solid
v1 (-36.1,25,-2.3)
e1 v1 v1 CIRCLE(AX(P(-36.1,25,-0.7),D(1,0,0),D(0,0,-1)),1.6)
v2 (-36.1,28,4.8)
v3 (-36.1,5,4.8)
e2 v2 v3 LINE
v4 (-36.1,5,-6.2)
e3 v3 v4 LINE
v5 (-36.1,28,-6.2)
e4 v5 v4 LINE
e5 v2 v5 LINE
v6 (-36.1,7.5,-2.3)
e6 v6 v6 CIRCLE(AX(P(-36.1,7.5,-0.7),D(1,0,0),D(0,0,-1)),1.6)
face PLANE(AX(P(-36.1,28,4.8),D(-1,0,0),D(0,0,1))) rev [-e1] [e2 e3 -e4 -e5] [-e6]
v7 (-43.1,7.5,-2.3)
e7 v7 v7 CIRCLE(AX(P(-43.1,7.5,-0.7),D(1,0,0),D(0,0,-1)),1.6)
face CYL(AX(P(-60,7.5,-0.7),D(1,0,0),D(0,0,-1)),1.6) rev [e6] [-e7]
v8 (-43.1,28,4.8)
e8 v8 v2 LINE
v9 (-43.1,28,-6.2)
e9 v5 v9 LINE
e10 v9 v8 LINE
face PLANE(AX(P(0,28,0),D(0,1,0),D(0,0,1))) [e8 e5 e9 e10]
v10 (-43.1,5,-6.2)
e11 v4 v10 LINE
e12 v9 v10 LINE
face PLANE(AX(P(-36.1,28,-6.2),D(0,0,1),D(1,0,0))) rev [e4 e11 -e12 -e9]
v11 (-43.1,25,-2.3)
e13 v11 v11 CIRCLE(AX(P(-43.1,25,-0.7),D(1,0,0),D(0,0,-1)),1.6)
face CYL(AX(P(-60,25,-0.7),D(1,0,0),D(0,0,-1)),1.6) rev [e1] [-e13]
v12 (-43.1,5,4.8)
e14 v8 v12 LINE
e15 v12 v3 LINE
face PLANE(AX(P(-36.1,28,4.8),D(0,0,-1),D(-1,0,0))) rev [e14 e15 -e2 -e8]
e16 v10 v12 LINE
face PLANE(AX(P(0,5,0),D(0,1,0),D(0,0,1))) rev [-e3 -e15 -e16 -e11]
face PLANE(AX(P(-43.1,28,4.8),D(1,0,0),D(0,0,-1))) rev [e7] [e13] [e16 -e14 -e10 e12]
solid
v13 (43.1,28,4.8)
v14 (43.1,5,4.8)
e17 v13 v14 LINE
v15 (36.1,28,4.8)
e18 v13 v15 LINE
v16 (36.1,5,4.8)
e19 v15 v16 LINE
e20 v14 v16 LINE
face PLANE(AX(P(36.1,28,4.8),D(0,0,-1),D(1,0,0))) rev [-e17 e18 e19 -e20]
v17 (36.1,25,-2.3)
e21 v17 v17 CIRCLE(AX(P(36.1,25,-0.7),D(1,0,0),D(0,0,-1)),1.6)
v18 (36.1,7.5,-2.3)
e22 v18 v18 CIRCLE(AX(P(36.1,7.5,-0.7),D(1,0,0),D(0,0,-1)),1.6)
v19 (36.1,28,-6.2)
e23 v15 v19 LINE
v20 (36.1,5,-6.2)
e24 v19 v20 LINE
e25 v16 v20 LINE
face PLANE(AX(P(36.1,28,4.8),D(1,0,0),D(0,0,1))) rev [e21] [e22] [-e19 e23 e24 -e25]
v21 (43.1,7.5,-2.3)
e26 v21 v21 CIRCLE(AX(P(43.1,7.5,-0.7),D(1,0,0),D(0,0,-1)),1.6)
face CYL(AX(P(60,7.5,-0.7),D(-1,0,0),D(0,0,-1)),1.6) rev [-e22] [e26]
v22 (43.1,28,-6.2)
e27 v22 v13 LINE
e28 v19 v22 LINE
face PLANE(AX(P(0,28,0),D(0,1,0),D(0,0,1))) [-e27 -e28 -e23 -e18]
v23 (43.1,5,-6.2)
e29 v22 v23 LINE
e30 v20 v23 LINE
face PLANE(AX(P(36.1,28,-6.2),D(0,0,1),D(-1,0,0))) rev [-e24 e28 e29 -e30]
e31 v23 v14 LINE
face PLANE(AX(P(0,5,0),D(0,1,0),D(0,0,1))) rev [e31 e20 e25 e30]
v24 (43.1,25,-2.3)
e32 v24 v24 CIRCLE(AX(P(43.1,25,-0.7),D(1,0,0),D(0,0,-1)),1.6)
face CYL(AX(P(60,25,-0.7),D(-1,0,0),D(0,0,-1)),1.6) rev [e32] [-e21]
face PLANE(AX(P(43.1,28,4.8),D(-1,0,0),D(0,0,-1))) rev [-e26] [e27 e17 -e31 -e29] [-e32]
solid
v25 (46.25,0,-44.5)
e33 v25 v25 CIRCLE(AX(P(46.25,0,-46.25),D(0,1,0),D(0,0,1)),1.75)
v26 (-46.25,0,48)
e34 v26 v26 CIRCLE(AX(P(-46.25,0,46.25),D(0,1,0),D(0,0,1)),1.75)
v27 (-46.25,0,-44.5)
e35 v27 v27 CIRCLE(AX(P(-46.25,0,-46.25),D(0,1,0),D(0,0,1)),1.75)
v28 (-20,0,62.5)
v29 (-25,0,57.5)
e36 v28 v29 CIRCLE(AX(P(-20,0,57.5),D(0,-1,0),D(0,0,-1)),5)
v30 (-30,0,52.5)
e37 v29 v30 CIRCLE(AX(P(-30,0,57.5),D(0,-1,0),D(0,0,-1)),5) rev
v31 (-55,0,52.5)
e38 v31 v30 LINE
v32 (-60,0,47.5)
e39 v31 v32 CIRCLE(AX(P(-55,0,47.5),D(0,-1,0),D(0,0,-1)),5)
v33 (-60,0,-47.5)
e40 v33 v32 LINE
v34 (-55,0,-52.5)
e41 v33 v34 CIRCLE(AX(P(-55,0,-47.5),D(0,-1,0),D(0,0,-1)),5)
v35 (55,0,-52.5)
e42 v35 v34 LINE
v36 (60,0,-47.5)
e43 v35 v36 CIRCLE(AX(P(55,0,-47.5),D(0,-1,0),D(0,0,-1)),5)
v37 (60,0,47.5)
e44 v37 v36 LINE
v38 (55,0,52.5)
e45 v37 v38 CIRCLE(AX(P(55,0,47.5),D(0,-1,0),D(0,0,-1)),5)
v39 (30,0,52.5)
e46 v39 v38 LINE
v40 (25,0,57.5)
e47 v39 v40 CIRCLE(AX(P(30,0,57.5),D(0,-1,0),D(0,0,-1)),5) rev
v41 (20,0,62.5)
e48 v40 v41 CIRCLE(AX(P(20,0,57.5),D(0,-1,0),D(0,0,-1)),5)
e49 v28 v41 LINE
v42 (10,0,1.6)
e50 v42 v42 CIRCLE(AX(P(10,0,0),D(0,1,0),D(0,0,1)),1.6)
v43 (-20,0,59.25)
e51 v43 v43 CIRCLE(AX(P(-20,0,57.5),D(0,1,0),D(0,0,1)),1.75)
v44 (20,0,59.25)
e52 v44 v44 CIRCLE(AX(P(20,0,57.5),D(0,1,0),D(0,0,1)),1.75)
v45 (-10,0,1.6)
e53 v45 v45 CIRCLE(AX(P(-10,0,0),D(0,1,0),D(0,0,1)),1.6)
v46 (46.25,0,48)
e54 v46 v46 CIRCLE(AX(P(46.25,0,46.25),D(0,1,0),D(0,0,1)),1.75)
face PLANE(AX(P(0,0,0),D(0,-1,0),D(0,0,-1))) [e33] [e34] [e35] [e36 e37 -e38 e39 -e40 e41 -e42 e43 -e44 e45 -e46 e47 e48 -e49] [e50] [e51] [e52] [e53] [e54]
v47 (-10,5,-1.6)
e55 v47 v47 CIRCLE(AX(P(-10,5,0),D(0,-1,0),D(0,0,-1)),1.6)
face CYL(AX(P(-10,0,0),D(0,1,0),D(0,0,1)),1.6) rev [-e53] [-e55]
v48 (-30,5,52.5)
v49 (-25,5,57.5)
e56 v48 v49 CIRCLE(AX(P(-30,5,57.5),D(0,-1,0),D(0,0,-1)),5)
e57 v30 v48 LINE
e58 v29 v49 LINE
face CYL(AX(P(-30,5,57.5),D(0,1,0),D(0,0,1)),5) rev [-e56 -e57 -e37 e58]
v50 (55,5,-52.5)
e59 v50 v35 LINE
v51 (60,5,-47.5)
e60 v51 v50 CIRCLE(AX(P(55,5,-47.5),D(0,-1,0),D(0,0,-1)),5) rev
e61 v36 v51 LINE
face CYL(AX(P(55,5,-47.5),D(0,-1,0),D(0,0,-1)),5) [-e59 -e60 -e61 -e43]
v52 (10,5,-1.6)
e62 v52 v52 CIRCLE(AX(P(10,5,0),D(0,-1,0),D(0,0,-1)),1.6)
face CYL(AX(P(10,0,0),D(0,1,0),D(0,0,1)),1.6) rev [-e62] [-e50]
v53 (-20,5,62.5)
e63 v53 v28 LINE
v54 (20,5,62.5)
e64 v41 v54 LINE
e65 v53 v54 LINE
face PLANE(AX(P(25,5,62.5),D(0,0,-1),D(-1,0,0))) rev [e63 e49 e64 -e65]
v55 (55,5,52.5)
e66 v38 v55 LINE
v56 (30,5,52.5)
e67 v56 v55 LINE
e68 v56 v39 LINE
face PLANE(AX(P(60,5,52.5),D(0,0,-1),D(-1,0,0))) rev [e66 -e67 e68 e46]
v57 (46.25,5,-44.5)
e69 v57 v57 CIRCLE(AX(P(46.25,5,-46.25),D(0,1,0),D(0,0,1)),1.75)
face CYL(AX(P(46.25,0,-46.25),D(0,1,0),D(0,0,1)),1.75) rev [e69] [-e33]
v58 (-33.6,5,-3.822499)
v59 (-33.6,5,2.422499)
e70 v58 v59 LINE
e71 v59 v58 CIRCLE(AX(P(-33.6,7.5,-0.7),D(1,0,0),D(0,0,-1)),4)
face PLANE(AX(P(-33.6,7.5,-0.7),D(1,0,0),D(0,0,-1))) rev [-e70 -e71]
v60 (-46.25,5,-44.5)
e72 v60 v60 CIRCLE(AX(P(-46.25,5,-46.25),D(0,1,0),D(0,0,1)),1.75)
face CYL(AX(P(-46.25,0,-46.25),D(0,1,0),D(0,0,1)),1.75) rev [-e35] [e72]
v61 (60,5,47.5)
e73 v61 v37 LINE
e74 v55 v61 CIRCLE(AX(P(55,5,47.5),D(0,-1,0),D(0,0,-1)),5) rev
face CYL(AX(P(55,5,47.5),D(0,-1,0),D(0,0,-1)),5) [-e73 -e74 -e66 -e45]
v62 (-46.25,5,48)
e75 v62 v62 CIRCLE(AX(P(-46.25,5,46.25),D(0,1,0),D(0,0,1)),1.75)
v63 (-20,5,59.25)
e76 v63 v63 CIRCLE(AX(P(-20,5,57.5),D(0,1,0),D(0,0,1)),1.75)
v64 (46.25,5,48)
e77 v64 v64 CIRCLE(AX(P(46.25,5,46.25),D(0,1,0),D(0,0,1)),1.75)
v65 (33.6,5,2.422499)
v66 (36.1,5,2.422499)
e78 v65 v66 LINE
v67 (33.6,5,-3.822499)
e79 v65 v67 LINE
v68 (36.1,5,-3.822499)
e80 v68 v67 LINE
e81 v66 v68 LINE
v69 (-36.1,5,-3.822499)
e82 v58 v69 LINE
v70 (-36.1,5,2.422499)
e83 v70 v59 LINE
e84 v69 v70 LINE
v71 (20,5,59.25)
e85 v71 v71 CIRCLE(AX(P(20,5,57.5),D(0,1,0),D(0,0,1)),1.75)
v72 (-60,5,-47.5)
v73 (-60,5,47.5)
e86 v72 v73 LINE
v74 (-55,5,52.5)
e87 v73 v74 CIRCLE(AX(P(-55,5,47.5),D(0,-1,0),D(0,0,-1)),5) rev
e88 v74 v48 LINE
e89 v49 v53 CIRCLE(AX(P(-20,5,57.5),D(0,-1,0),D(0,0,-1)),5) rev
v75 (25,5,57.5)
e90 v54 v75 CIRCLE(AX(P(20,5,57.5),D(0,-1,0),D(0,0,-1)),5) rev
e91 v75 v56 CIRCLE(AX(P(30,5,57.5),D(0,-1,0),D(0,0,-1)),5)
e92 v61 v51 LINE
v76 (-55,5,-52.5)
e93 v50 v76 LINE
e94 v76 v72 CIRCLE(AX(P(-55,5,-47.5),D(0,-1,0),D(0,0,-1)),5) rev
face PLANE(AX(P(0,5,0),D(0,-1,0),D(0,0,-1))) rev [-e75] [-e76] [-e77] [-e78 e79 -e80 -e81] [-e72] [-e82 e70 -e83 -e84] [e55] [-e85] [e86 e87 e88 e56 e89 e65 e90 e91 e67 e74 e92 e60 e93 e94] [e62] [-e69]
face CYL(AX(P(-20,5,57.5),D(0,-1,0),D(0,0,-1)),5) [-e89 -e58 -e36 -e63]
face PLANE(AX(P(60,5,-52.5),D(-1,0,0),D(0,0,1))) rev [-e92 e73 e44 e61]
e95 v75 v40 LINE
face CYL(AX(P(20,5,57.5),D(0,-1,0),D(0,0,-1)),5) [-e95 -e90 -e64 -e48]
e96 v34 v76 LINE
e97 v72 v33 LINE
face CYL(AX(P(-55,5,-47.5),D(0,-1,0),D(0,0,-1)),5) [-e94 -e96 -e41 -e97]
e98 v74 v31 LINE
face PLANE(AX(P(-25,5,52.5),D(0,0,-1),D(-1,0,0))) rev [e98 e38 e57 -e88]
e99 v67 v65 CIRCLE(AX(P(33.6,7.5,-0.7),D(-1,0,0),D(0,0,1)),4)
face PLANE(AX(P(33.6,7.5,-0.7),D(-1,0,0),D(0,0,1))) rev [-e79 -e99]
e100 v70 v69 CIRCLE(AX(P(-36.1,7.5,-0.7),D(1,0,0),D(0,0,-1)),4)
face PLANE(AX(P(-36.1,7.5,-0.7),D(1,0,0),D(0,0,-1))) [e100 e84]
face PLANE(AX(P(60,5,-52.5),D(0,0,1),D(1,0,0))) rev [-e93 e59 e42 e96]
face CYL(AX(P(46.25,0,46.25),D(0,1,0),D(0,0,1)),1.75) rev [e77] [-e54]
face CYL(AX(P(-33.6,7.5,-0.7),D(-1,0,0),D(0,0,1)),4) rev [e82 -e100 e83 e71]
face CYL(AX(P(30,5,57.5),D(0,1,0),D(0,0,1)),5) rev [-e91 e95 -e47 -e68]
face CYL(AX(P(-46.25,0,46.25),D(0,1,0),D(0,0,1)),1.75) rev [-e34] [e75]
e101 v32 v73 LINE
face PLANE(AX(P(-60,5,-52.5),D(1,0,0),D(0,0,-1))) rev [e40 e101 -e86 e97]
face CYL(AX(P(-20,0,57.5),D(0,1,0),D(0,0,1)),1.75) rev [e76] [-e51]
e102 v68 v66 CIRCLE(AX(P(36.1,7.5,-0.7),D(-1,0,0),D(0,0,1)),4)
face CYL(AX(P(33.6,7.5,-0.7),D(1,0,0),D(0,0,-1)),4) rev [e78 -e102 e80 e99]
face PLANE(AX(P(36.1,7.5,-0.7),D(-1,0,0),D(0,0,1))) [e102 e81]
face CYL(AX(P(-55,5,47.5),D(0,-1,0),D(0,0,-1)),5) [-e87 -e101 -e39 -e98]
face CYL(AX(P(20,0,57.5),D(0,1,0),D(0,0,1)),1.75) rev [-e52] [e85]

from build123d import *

# Parameters (mm, degrees)
EXTRUDE_1_DEPTH         = 5
FILLET_1_R              = 5
SKETCH_2_W              = 7
SKETCH_2_H              = 11
EXTRUDE_2_DEPTH         = 23
SKETCH_3_R              = 1.6
CUT_EXTRUDE_1_DEPTH     = 119.006186279
SKETCH_5_R              = 1.75
CUT_EXTRUDE_3_DEPTH     = 90.639556001
SKETCH_6_R              = 1.75
CUT_EXTRUDE_4_DEPTH     = 90.639556001
SKETCH2_R               = 4
CUT_EXTRUDE1_DEPTH      = 2.5
CUT_EXTRUDE2_START      = 2.5
SKETCH3_R               = 4
CUT_EXTRUDE2_DEPTH      = 2.5
CUT_EXTRUDE3_DEPTH      = 90.639556001
CUT_EXTRUDE3_DEPTH_BACK = 90.639556001
SKETCH4_R               = 1.6


with BuildPart() as part:
    # 스케치1 → 보스-돌출1 (new body)
    with BuildSketch(Plane(origin=(0, 0, 0), x_dir=(1, 0, 0), z_dir=(0, 1, 0))):
        Polygon((-25, -52.5), (-60, -52.5), (-60, 52.5), (60, 52.5), (60, -52.5), (25, -52.5), (25, -62.5), (-25, -62.5), align=None)
    extrude(amount=EXTRUDE_1_DEPTH)

    # 필렛1
    fillet_1_edges = [part.edges().sort_by_distance(p)[0] for p in [
        (60, 2.5, -52.5),
        (60, 2.5, 52.5),
        (-60, 2.5, -52.5),
        (-60, 2.5, 52.5),
        (-25, 2.5, 52.5),
        (25, 2.5, 52.5),
        (25, 2.5, 62.5),
        (-25, 2.5, 62.5),
    ]]
    fillet(fillet_1_edges, radius=FILLET_1_R - 0.0001)  # a hair under: the kernel refuses the full size

    # 스케치5 → 컷-돌출3 (cut, through all)
    with BuildSketch(Plane(origin=(0, 5, 0), x_dir=(1, 0, 0), z_dir=(0, 1, 0))):
        with Locations(Location((-46.25, -46.25, 0), (0, 0, 270))):
            Circle(SKETCH_5_R)
        with Locations(Location((-46.25, 46.25, 0), (0, 0, 270))):
            Circle(SKETCH_5_R)
        with Locations(Location((46.25, 46.25, 0), (0, 0, 270))):
            Circle(SKETCH_5_R)
        with Locations(Location((46.25, -46.25, 0), (0, 0, 270))):
            Circle(SKETCH_5_R)
    extrude(amount=-CUT_EXTRUDE_3_DEPTH, mode=Mode.SUBTRACT)

    # 스케치6 → 컷-돌출4 (cut, through all)
    with BuildSketch(Plane(origin=(0, 5, 0), x_dir=(1, 0, 0), z_dir=(0, 1, 0))):
        with Locations(Location((20, -57.5, 0), (0, 0, 270))):
            Circle(SKETCH_6_R)
        with Locations(Location((-20, -57.5, 0), (0, 0, 270))):
            Circle(SKETCH_6_R)
    extrude(amount=-CUT_EXTRUDE_4_DEPTH, mode=Mode.SUBTRACT)

    # Sketch2 → Cut-Extrude1 (cut)
    with BuildSketch(Plane.ZY.offset(-36.1)):
        with Locations((-0.7, 7.5)):
            Circle(SKETCH2_R)
    extrude(amount=CUT_EXTRUDE1_DEPTH, mode=Mode.SUBTRACT)

    # Sketch3 → Cut-Extrude2 (cut)
    with BuildSketch(Plane(origin=(-36.1, 0, 0), x_dir=(0, 0, -1), z_dir=(1, 0, 0)).offset(CUT_EXTRUDE2_START)):
        with Locations((0.7, 7.5)):
            Circle(SKETCH3_R)
    extrude(amount=-CUT_EXTRUDE2_DEPTH, mode=Mode.SUBTRACT)

    # Sketch4 → Cut-Extrude3 (cut, two sides: drawn at the far end of the back side and taken through both)
    with BuildSketch(Plane(origin=(0, 5, 0), x_dir=(1, 0, 0), z_dir=(0, 1, 0)).offset(-CUT_EXTRUDE3_DEPTH_BACK)):
        with Locations(Location((-10, 0, 0), (0, 0, 270))):
            Circle(SKETCH4_R)
        with Locations(Location((10, 0, 0), (0, 0, 270))):
            Circle(SKETCH4_R)
    extrude(amount=CUT_EXTRUDE3_DEPTH + CUT_EXTRUDE3_DEPTH_BACK, mode=Mode.SUBTRACT)


with BuildPart() as body_2:
    # 스케치2 → 보스-돌출2 (new body)
    with BuildSketch(Plane(origin=(0, 5, 0), x_dir=(1, 0, 0), z_dir=(0, 1, 0))):
        with Locations((-39.6, 0.7)):
            Rectangle(SKETCH_2_W, SKETCH_2_H)
    extrude(amount=EXTRUDE_2_DEPTH)

    # 스케치3 → 컷-돌출1 (cut, through all)
    with BuildSketch(Plane(origin=(-36.1, 0, 0), x_dir=(0, 0, -1), z_dir=(1, 0, 0))):
        with Locations((0.7, 25)):
            Circle(SKETCH_3_R)
        with Locations((0.7, 7.5)):
            Circle(SKETCH_3_R)
    extrude(amount=-CUT_EXTRUDE_1_DEPTH, mode=Mode.SUBTRACT)


with BuildPart() as body_3:
    # 대칭 복사1: mirrored copy
    add(body_2.part.mirror(Plane(origin=(0, 0, 0), x_dir=(0, 0, 1), z_dir=(1, 0, 0))))


solid = Compound([part.part, body_2.part, body_3.part])
